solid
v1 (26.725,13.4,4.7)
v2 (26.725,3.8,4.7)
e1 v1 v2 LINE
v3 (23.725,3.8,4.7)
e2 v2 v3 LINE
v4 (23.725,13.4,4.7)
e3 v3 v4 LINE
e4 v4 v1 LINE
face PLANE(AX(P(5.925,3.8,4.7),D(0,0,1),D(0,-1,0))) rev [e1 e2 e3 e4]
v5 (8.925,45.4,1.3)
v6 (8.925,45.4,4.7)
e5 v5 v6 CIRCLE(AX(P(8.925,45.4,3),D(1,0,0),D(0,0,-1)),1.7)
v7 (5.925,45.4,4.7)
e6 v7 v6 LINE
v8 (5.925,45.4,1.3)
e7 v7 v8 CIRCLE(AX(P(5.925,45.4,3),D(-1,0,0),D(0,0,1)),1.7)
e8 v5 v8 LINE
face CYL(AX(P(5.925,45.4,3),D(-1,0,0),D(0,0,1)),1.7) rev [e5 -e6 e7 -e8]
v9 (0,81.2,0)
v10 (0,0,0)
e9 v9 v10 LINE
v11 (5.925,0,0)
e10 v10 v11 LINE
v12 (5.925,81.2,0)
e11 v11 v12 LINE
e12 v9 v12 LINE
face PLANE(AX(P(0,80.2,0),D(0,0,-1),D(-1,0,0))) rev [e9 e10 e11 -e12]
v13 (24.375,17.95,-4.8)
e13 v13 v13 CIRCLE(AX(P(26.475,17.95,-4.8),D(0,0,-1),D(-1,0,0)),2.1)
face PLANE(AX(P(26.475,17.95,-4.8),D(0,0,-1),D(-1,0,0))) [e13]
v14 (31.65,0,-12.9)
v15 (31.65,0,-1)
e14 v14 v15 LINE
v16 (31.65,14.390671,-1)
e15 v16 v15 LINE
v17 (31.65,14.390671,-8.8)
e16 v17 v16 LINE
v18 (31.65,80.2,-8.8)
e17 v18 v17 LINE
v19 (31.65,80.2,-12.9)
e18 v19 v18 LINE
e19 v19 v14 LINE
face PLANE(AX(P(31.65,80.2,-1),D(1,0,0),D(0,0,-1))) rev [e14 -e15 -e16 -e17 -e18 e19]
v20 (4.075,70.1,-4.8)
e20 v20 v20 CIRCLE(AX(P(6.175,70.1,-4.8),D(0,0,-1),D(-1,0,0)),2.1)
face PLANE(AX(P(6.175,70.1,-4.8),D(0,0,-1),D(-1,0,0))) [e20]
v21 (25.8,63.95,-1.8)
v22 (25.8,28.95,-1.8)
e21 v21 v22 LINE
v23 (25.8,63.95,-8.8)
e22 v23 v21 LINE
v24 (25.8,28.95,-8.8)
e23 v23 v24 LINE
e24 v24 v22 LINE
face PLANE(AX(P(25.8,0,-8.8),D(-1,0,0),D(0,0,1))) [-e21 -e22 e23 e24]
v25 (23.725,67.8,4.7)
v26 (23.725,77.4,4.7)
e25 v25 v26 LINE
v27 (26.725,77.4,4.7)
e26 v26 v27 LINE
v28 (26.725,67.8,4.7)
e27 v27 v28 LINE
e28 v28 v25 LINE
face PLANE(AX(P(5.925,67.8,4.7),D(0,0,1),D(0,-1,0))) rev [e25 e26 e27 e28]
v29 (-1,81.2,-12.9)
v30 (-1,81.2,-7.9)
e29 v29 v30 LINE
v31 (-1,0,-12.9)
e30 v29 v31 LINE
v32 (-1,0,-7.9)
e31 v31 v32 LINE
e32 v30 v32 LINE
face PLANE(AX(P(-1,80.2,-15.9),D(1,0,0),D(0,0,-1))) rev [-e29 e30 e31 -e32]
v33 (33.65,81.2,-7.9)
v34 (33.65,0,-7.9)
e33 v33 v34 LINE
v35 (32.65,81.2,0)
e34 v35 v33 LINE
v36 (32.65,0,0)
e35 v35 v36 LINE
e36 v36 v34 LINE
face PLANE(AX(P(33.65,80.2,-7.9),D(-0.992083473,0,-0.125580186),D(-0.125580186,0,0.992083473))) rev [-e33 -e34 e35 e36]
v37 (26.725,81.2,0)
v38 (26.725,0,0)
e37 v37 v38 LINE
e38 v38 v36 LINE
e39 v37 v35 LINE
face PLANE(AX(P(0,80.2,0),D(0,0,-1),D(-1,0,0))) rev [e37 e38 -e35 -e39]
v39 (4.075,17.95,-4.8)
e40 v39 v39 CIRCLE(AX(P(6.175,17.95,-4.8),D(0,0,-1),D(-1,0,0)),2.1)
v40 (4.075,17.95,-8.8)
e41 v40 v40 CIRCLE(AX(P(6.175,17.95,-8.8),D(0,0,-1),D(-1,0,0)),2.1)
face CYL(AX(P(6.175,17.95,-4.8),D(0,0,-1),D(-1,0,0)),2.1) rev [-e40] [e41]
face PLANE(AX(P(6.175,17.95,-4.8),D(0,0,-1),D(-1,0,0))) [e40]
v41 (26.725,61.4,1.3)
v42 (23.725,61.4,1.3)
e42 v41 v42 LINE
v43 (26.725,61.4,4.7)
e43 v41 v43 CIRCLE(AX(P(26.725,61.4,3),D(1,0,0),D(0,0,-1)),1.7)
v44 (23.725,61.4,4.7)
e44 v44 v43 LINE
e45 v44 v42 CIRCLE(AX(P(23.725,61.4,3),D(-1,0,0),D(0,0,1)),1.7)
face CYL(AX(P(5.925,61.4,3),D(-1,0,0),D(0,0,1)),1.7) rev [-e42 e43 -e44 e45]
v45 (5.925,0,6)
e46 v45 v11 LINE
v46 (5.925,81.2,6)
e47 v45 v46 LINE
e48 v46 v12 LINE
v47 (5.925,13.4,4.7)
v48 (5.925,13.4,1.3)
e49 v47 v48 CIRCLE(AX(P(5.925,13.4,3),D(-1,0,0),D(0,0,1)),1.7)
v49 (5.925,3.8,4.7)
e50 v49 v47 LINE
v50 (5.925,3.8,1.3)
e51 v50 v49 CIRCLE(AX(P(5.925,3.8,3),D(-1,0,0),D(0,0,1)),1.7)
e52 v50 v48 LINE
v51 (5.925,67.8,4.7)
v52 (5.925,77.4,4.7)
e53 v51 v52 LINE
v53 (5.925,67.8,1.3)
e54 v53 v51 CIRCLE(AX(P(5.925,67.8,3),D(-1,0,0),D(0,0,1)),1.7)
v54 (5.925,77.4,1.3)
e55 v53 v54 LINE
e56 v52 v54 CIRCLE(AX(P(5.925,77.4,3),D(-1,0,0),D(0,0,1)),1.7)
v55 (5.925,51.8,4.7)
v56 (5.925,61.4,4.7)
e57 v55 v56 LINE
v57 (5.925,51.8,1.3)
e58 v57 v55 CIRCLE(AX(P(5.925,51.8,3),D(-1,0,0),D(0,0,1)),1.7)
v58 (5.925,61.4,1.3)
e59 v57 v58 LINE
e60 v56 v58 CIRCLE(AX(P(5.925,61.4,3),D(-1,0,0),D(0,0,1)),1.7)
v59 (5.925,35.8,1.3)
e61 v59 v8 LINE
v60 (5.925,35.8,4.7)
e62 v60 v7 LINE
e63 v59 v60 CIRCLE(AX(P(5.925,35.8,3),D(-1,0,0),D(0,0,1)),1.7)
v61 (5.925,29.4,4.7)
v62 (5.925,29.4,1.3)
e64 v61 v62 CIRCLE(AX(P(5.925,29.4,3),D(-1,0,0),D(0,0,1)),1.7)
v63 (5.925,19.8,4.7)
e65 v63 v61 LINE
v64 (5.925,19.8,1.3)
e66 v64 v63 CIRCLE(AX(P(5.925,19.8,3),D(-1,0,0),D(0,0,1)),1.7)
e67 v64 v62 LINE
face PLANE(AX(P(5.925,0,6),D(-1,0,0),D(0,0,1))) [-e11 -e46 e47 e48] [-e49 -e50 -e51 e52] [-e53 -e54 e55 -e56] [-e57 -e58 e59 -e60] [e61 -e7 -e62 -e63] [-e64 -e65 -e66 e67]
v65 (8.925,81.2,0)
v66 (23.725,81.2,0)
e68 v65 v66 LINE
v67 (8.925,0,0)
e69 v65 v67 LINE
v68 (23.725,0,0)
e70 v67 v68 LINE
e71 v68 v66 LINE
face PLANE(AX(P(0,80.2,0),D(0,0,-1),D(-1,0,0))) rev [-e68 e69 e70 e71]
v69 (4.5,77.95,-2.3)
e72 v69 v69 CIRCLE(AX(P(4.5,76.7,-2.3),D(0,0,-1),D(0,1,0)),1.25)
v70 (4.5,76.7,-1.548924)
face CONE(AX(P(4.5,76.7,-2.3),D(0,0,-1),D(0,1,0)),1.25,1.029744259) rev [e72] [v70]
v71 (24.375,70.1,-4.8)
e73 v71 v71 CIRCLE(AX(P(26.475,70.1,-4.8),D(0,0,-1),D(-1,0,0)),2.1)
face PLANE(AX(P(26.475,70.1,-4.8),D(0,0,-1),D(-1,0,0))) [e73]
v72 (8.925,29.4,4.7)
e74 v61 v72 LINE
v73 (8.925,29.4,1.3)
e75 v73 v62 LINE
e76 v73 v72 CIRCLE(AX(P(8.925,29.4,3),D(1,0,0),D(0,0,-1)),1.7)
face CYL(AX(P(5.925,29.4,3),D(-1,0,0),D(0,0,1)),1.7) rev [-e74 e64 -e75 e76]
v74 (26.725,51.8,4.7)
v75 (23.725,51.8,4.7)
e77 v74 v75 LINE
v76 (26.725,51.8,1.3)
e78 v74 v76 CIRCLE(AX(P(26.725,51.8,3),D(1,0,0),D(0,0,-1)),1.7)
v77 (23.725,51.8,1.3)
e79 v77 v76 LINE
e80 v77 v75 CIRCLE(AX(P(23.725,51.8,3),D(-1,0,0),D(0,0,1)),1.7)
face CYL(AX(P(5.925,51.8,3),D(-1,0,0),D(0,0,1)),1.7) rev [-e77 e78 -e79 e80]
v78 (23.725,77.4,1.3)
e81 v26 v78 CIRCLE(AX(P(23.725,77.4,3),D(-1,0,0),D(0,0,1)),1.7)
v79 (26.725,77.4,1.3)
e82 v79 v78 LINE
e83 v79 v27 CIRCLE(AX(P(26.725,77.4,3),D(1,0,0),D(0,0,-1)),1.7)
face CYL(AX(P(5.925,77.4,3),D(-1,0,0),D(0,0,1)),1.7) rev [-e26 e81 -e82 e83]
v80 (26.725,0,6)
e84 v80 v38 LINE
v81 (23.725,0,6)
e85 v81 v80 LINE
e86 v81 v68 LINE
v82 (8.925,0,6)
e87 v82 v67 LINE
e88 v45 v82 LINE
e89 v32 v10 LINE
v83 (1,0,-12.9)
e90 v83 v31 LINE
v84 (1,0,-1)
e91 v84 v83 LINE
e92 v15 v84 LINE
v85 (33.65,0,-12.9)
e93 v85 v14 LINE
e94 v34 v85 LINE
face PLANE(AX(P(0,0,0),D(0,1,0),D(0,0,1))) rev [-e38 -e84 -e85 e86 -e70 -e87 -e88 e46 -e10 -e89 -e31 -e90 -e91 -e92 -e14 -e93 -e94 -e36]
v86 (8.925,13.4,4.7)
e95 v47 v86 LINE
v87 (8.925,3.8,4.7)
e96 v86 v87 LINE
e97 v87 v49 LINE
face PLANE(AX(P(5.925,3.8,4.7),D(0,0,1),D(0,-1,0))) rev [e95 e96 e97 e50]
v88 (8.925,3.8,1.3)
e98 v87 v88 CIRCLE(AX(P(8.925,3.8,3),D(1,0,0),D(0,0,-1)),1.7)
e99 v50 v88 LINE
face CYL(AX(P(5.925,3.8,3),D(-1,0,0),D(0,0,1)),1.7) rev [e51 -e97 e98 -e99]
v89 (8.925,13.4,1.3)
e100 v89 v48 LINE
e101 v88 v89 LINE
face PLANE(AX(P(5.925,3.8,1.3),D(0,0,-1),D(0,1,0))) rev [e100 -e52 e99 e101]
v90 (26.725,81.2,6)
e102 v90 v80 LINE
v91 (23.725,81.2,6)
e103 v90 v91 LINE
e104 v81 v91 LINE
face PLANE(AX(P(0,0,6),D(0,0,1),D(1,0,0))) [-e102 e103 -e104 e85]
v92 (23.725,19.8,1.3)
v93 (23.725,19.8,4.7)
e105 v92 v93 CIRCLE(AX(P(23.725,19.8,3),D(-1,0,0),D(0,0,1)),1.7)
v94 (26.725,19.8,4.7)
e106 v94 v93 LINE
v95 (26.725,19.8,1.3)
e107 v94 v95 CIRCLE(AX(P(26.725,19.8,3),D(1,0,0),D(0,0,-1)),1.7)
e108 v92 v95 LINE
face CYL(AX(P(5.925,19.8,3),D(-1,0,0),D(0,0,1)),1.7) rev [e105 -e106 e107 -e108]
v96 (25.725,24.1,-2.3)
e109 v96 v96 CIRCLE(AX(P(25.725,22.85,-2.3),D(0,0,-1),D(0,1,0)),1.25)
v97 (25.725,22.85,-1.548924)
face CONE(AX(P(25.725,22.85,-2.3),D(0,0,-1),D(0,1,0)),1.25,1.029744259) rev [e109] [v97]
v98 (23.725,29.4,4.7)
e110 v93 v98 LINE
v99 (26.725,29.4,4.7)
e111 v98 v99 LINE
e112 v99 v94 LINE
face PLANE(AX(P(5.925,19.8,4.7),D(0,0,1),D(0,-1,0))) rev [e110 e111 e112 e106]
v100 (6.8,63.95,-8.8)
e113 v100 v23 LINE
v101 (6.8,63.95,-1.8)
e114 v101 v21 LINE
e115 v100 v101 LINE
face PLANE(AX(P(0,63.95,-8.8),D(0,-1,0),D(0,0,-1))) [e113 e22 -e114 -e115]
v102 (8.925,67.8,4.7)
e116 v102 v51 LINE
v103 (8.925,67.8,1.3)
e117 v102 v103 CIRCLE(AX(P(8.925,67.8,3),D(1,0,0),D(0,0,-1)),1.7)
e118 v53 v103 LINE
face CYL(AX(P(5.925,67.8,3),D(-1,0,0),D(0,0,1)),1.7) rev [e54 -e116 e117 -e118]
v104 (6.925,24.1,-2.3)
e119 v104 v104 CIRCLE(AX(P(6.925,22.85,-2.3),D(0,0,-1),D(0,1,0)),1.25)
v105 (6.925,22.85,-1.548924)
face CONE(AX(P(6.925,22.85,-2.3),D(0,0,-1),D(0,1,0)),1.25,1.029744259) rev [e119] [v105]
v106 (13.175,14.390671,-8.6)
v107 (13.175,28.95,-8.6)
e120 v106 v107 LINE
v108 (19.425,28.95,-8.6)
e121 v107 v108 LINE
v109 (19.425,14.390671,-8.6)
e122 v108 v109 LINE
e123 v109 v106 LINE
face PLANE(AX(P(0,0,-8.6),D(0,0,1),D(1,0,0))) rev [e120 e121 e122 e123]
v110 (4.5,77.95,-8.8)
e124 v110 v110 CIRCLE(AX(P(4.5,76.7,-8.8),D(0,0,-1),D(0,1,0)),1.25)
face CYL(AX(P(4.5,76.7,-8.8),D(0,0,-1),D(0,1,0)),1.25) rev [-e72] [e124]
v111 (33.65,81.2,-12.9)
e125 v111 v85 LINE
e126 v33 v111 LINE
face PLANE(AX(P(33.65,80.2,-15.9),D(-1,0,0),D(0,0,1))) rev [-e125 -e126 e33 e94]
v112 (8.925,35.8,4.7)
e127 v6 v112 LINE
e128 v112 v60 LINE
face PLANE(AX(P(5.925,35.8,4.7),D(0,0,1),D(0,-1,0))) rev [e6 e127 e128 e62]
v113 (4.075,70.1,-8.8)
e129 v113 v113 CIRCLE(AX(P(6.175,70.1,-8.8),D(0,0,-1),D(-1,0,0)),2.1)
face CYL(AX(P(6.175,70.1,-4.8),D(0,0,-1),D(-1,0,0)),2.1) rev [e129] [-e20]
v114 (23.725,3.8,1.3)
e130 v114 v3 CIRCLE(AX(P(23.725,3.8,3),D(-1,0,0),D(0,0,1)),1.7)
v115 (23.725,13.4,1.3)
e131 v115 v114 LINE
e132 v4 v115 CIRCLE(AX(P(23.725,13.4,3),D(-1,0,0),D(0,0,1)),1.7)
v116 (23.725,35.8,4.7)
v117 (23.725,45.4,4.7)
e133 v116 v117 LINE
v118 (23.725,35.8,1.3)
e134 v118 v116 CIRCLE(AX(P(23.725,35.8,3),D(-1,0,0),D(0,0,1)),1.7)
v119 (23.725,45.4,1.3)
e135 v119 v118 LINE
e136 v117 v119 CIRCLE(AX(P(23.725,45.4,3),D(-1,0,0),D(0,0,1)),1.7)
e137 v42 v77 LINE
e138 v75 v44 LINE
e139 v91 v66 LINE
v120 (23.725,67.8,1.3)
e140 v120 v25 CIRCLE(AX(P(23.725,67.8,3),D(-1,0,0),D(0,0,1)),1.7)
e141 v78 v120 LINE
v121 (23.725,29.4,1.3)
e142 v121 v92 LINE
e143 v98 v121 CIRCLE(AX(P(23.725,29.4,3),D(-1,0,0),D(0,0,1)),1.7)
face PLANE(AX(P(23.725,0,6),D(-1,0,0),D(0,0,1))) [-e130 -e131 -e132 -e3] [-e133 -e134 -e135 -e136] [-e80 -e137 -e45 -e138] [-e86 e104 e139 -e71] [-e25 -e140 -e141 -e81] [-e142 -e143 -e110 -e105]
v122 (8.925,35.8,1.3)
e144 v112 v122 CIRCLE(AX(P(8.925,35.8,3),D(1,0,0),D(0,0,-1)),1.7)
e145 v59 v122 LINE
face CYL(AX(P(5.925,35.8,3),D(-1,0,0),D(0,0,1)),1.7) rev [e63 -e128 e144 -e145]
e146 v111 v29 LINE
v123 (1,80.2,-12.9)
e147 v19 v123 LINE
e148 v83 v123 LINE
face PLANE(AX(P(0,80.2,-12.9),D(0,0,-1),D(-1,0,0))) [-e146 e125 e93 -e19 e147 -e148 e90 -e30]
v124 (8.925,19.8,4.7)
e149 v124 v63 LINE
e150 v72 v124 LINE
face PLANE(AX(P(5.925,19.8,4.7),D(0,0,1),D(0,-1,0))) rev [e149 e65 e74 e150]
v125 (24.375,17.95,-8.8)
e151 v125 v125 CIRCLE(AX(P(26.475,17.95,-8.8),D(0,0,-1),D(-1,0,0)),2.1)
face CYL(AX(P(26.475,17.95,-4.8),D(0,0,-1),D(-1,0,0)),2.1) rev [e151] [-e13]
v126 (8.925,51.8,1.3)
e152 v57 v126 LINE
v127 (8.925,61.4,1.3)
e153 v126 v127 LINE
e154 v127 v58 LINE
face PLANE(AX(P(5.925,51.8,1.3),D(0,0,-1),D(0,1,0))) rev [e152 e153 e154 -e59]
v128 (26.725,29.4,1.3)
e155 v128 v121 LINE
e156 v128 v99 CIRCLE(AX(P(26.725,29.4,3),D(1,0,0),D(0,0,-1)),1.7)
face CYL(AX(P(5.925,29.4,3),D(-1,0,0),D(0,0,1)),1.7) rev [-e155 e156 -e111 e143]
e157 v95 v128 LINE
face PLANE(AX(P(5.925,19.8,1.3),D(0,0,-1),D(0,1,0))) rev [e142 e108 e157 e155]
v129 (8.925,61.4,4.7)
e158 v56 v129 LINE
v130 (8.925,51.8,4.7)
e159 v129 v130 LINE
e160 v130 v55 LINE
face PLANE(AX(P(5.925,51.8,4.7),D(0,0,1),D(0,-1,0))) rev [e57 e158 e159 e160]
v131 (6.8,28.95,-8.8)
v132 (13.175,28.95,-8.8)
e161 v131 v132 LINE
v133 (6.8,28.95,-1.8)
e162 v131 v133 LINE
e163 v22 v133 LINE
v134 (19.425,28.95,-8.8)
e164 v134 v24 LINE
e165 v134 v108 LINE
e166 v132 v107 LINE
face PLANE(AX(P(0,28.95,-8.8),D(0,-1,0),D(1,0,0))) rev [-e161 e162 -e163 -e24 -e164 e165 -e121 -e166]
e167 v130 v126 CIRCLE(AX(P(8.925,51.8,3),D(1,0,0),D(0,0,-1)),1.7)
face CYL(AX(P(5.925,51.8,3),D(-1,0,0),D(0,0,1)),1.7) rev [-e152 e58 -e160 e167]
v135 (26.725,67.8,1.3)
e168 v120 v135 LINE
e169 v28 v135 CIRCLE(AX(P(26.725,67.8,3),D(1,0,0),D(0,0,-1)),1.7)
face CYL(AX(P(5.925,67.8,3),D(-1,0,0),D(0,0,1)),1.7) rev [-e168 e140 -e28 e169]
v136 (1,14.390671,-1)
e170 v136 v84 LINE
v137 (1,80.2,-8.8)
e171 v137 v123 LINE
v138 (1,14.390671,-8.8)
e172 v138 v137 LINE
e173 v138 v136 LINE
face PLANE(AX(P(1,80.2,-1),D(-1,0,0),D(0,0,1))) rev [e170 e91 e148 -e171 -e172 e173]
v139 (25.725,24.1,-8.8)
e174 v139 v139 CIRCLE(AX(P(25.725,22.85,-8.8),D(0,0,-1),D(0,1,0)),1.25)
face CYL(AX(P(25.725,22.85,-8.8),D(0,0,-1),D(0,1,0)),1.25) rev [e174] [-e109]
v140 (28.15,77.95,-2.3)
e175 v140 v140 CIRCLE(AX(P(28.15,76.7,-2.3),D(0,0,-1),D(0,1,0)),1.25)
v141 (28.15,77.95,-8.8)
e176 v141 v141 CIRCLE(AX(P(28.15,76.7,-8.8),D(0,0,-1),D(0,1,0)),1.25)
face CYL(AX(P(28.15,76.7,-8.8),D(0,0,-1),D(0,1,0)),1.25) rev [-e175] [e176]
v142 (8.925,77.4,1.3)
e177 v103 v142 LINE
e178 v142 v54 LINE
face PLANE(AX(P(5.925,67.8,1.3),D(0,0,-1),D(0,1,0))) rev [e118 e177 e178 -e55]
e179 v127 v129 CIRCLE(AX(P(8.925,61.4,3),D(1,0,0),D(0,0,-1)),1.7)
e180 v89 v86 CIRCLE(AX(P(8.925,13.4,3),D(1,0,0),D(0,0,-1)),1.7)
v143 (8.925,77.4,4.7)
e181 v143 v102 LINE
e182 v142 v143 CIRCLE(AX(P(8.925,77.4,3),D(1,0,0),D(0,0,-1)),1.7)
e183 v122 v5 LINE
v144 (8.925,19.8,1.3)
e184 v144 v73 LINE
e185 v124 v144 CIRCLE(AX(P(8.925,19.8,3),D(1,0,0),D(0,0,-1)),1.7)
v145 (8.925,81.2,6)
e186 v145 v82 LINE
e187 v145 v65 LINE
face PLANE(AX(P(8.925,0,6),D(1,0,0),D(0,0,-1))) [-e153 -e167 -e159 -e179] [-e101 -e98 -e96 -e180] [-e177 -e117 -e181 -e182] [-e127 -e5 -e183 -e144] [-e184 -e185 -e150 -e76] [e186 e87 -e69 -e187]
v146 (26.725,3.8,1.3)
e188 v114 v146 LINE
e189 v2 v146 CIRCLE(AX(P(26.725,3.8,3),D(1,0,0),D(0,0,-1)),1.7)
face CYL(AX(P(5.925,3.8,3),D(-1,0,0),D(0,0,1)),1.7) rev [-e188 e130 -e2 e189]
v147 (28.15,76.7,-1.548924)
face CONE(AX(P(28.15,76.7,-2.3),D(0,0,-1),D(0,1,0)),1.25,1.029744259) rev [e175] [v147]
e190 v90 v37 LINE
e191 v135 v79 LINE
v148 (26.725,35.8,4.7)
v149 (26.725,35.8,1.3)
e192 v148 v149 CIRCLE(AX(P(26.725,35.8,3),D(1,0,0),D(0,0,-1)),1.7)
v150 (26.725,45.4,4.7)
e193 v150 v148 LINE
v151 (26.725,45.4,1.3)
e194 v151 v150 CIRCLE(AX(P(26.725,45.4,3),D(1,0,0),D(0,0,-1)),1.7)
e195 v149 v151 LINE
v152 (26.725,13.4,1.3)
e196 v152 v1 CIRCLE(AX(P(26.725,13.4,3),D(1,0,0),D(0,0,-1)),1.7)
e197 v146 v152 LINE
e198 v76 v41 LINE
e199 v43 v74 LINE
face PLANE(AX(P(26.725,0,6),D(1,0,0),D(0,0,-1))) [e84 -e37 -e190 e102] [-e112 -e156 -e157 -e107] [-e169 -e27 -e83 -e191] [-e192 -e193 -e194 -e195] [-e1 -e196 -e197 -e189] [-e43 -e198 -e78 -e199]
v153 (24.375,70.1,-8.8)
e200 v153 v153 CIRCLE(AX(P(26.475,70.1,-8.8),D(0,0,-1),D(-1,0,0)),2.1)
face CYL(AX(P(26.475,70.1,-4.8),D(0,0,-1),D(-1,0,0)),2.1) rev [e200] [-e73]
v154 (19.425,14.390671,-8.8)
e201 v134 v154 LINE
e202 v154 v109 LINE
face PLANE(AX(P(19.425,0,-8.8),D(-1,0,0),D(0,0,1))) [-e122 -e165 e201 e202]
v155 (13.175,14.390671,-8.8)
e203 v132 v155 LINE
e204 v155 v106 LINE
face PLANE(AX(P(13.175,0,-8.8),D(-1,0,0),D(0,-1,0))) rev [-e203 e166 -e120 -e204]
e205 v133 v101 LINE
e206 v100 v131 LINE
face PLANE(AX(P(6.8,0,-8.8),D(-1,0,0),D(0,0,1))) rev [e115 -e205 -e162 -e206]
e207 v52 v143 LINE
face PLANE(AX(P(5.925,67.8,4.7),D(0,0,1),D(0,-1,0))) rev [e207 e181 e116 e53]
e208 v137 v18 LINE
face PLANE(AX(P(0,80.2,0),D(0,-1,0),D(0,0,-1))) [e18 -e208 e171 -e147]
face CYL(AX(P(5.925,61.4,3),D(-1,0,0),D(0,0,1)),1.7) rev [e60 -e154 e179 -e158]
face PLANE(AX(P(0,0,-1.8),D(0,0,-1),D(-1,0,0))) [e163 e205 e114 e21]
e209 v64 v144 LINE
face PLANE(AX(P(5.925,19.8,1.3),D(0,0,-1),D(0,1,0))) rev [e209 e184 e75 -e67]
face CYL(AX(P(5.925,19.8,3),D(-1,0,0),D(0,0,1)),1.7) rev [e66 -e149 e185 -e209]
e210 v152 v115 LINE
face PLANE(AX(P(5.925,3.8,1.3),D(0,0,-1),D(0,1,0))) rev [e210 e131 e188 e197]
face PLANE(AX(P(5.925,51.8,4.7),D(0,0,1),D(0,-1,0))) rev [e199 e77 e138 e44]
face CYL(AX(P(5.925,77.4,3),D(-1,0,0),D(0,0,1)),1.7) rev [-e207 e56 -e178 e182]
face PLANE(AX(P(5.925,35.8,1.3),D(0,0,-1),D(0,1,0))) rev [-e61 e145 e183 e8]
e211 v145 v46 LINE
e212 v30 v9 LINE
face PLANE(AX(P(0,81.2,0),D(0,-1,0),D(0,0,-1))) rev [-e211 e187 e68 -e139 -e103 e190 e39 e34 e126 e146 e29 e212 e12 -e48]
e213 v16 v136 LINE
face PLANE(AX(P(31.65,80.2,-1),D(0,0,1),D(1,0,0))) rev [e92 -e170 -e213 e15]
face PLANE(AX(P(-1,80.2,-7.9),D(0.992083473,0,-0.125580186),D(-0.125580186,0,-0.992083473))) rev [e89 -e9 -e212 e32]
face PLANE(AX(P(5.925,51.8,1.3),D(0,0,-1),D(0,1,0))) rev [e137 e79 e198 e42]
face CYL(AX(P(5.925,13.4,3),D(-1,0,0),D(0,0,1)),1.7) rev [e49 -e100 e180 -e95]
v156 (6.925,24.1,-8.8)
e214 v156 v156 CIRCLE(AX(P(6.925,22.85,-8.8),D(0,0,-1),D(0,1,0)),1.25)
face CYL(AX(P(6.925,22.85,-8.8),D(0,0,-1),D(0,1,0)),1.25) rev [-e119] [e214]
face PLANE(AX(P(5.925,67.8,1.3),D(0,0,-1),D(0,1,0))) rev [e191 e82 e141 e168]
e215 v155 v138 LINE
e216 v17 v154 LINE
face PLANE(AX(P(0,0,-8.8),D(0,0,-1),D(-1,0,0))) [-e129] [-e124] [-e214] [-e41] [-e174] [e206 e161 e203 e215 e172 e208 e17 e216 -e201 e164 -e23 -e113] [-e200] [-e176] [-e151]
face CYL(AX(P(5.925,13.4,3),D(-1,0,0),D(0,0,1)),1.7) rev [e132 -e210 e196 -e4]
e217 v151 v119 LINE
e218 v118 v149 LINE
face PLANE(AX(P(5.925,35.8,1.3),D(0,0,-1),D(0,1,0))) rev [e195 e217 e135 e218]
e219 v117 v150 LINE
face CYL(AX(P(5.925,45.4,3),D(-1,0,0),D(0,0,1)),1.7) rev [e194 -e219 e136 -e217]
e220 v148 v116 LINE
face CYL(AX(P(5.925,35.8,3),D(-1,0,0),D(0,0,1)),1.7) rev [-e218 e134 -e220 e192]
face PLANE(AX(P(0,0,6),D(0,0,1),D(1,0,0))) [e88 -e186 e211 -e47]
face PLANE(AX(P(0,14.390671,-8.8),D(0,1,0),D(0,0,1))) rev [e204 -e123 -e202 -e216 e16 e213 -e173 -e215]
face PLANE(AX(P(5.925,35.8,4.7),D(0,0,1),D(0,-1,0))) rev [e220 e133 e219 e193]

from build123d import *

# Parameters (mm, degrees)
BOSS_EXTRUDE1_DEPTH             = 80.2
BOSS_EXTRUDE2_DEPTH             = 1
SKETCH4_W                       = 3
SKETCH4_H                       = 81.2
BOSS_EXTRUDE3_DEPTH             = 6
M3_START                        = 5.925
M3_CLEARANCE_SLOT1_DEPTH        = 20.8
SKETCH24_W                      = 20.25
SKETCH24_H                      = 3
CUT_EXTRUDE5_DEPTH              = 1
BOSS_EXTRUDE7_DEPTH             = 7.8
SKETCH31_W                      = 34.65
SKETCH31_H                      = 3
CUT_EXTRUDE6_DEPTH              = 95
SKETCH34_W                      = 6.25
SKETCH34_H                      = 14.559328602
BOSS_EXTRUDE8_DEPTH             = 7.6
SKETCH35_R                      = 2.1
CUT_EXTRUDE7_DEPTH              = 4
SKETCH36_W                      = 19
SKETCH36_H                      = 35
BOSS_EXTRUDE9_DEPTH             = 0.8
TAP_DRILL_FOR_M3X0_5_TAP1_D     = 2.5
TAP_DRILL_FOR_M3X0_5_TAP1_DEPTH = 6.5
TAP_DRILL_FOR_M3X0_5_TAP1_TIP   = 0.751075774
TAP_DRILL_FOR_M3X0_5_TAP2_D     = 2.5
TAP_DRILL_FOR_M3X0_5_TAP2_DEPTH = 6.5
TAP_DRILL_FOR_M3X0_5_TAP2_TIP   = 0.751075774


# Read off the part's stored shape, not the designer's step: M3 Clearance Slot1
with BuildPart() as part:
    # Sketch1 → Boss-Extrude1 (new body)
    with BuildSketch(Plane(origin=(0, 0, 0), x_dir=(1, 0, 0), z_dir=(0, 1, 0))):
        Polygon((0, 0), (32.65, 0), (33.65, 7.9), (33.65, 15.9), (31.65, 15.9), (31.65, 1), (1, 1), (1, 15.9), (-1, 15.9), (-1, 7.9), align=None)
    extrude(amount=BOSS_EXTRUDE1_DEPTH)

    # Sketch2 → Boss-Extrude2 (add)
    with BuildSketch(Plane(origin=(0, 80.2, 0), x_dir=(1, 0, 0), z_dir=(0, 1, 0))):
        Polygon((32.65, 0), (0, 0), (-1, 7.9), (-1, 15.9), (33.65, 15.9), (33.65, 7.9), align=None)
    extrude(amount=BOSS_EXTRUDE2_DEPTH)

    # Sketch4 → Boss-Extrude3 (add)
    with BuildSketch(Plane.XY):
        with Locations((25.225, 40.6)):
            Rectangle(SKETCH4_W, SKETCH4_H)
        with Locations((7.425, 40.6)):
            Rectangle(SKETCH4_W, SKETCH4_H)
    extrude(amount=BOSS_EXTRUDE3_DEPTH)

    # M3 Clearance Slot1 outline → M3 Clearance Slot1 (cut)
    with BuildSketch(Plane.YZ.offset(M3_START)):
        with BuildLine():
            ThreePointArc((13.4, 1.3), (15.1, 3), (13.4, 4.7))
            Line((13.4, 4.7), (3.8, 4.7))
            ThreePointArc((3.8, 4.7), (2.1, 3), (3.8, 1.3))
            Line((3.8, 1.3), (13.4, 1.3))
        make_face()
        with BuildLine():
            ThreePointArc((19.8, 4.7), (18.1, 3), (19.8, 1.3))
            Line((19.8, 1.3), (29.4, 1.3))
            ThreePointArc((29.4, 1.3), (31.1, 3), (29.4, 4.7))
            Line((29.4, 4.7), (19.8, 4.7))
        make_face()
        with BuildLine():
            ThreePointArc((35.8, 4.7), (34.1, 3), (35.8, 1.3))
            Line((35.8, 1.3), (45.4, 1.3))
            ThreePointArc((45.4, 1.3), (47.1, 3), (45.4, 4.7))
            Line((45.4, 4.7), (35.8, 4.7))
        make_face()
        with BuildLine():
            ThreePointArc((51.8, 4.7), (50.1, 3), (51.8, 1.3))
            Line((51.8, 1.3), (61.4, 1.3))
            ThreePointArc((61.4, 1.3), (63.1, 3), (61.4, 4.7))
            Line((61.4, 4.7), (51.8, 4.7))
        make_face()
        with BuildLine():
            ThreePointArc((67.8, 4.7), (66.1, 3), (67.8, 1.3))
            Line((67.8, 1.3), (77.4, 1.3))
            ThreePointArc((77.4, 1.3), (79.1, 3), (77.4, 4.7))
            Line((77.4, 4.7), (67.8, 4.7))
        make_face()
    extrude(amount=M3_CLEARANCE_SLOT1_DEPTH, mode=Mode.SUBTRACT)

    # Sketch24 → Cut-Extrude5 (cut)
    with BuildSketch(Plane(origin=(0, 81.2, 0), x_dir=(1, 0, 0), z_dir=(0, 1, 0))):
        with Locations((16.325, 14.4)):
            Rectangle(SKETCH24_W, SKETCH24_H)
    extrude(amount=-CUT_EXTRUDE5_DEPTH, mode=Mode.SUBTRACT)

    # Sketch30 → Boss-Extrude7 (add)
    with BuildSketch(Plane(origin=(0, 0, -1), x_dir=(-1, 0, 0), z_dir=(0, 0, -1))):
        Polygon((-26.8, 27.95), (-19.425, 27.95), (-19.425, 28.95), (-25.8, 28.95), (-25.8, 63.95), (-6.8, 63.95), (-6.8, 28.95), (-13.175, 28.95), (-13.175, 27.95), (-5.8, 27.95), (-5.8, 64.95), (-26.8, 64.95), align=None)
        Polygon((-31.65, 80.2), (-31.65, 27.95), (-26.8, 27.95), (-26.8, 64.95), (-5.8, 64.95), (-5.8, 27.95), (-1, 27.95), (-1, 80.2), align=None)
        Polygon((-31.65, 27.95), (-31.65, 14.390671398), (-19.425, 14.390671398), (-19.425, 27.95), (-26.8, 27.95), align=None)
        Polygon((-13.175, 27.95), (-13.175, 14.390671398), (-1, 14.390671398), (-1, 27.95), (-5.8, 27.95), align=None)
    extrude(amount=BOSS_EXTRUDE7_DEPTH)

    # Sketch31 → Cut-Extrude6 (cut)
    with BuildSketch(Plane.XZ):
        with Locations((16.325, -14.4)):
            Rectangle(SKETCH31_W, SKETCH31_H)
    extrude(amount=-CUT_EXTRUDE6_DEPTH, mode=Mode.SUBTRACT)

    # Sketch34 → Boss-Extrude8 (add)
    with BuildSketch(Plane(origin=(0, 0, -1), x_dir=(-1, 0, 0), z_dir=(0, 0, -1))):
        with Locations((-16.3, 21.670335699)):
            Rectangle(SKETCH34_W, SKETCH34_H)
    extrude(amount=BOSS_EXTRUDE8_DEPTH)

    # Sketch35 → Cut-Extrude7 (cut)
    with BuildSketch(Plane(origin=(0, 0, -8.8), x_dir=(-1, 0, 0), z_dir=(0, 0, -1))):
        with Locations((-26.475, 70.1)):
            Circle(SKETCH35_R)
        with Locations((-6.175, 70.1)):
            Circle(SKETCH35_R)
        with Locations((-6.175, 17.95)):
            Circle(SKETCH35_R)
        with Locations((-26.475, 17.95)):
            Circle(SKETCH35_R)
    extrude(amount=-CUT_EXTRUDE7_DEPTH, mode=Mode.SUBTRACT)

    # Sketch36 → Boss-Extrude9 (add)
    with BuildSketch(Plane(origin=(0, 0, -1), x_dir=(-1, 0, 0), z_dir=(0, 0, -1))):
        with Locations((-16.3, 46.45)):
            Rectangle(SKETCH36_W, SKETCH36_H)
    extrude(amount=BOSS_EXTRUDE9_DEPTH)

    # Tap Drill for M3x0.5 Tap1
    with Locations(Plane(origin=(28.15, 76.7, -8.8), x_dir=(-1, 0, 0), z_dir=(0, 0, -1))):
        with Locations((0, 0), (23.65, 0)):
            Hole(TAP_DRILL_FOR_M3X0_5_TAP1_D / 2, depth=TAP_DRILL_FOR_M3X0_5_TAP1_DEPTH)
            with Locations((0, 0, -(TAP_DRILL_FOR_M3X0_5_TAP1_DEPTH + TAP_DRILL_FOR_M3X0_5_TAP1_TIP / 2))):  # 118° drill point
                Cone(0, TAP_DRILL_FOR_M3X0_5_TAP1_D / 2, TAP_DRILL_FOR_M3X0_5_TAP1_TIP, mode=Mode.SUBTRACT)

    # Tap Drill for M3x0.5 Tap2
    with Locations(Plane(origin=(25.725, 22.85, -8.8), x_dir=(-1, 0, 0), z_dir=(0, 0, -1))):
        with Locations((0, 0), (18.8, 0)):
            Hole(TAP_DRILL_FOR_M3X0_5_TAP2_D / 2, depth=TAP_DRILL_FOR_M3X0_5_TAP2_DEPTH)
            with Locations((0, 0, -(TAP_DRILL_FOR_M3X0_5_TAP2_DEPTH + TAP_DRILL_FOR_M3X0_5_TAP2_TIP / 2))):  # 118° drill point
                Cone(0, TAP_DRILL_FOR_M3X0_5_TAP2_D / 2, TAP_DRILL_FOR_M3X0_5_TAP2_TIP, mode=Mode.SUBTRACT)


solid = part.part
